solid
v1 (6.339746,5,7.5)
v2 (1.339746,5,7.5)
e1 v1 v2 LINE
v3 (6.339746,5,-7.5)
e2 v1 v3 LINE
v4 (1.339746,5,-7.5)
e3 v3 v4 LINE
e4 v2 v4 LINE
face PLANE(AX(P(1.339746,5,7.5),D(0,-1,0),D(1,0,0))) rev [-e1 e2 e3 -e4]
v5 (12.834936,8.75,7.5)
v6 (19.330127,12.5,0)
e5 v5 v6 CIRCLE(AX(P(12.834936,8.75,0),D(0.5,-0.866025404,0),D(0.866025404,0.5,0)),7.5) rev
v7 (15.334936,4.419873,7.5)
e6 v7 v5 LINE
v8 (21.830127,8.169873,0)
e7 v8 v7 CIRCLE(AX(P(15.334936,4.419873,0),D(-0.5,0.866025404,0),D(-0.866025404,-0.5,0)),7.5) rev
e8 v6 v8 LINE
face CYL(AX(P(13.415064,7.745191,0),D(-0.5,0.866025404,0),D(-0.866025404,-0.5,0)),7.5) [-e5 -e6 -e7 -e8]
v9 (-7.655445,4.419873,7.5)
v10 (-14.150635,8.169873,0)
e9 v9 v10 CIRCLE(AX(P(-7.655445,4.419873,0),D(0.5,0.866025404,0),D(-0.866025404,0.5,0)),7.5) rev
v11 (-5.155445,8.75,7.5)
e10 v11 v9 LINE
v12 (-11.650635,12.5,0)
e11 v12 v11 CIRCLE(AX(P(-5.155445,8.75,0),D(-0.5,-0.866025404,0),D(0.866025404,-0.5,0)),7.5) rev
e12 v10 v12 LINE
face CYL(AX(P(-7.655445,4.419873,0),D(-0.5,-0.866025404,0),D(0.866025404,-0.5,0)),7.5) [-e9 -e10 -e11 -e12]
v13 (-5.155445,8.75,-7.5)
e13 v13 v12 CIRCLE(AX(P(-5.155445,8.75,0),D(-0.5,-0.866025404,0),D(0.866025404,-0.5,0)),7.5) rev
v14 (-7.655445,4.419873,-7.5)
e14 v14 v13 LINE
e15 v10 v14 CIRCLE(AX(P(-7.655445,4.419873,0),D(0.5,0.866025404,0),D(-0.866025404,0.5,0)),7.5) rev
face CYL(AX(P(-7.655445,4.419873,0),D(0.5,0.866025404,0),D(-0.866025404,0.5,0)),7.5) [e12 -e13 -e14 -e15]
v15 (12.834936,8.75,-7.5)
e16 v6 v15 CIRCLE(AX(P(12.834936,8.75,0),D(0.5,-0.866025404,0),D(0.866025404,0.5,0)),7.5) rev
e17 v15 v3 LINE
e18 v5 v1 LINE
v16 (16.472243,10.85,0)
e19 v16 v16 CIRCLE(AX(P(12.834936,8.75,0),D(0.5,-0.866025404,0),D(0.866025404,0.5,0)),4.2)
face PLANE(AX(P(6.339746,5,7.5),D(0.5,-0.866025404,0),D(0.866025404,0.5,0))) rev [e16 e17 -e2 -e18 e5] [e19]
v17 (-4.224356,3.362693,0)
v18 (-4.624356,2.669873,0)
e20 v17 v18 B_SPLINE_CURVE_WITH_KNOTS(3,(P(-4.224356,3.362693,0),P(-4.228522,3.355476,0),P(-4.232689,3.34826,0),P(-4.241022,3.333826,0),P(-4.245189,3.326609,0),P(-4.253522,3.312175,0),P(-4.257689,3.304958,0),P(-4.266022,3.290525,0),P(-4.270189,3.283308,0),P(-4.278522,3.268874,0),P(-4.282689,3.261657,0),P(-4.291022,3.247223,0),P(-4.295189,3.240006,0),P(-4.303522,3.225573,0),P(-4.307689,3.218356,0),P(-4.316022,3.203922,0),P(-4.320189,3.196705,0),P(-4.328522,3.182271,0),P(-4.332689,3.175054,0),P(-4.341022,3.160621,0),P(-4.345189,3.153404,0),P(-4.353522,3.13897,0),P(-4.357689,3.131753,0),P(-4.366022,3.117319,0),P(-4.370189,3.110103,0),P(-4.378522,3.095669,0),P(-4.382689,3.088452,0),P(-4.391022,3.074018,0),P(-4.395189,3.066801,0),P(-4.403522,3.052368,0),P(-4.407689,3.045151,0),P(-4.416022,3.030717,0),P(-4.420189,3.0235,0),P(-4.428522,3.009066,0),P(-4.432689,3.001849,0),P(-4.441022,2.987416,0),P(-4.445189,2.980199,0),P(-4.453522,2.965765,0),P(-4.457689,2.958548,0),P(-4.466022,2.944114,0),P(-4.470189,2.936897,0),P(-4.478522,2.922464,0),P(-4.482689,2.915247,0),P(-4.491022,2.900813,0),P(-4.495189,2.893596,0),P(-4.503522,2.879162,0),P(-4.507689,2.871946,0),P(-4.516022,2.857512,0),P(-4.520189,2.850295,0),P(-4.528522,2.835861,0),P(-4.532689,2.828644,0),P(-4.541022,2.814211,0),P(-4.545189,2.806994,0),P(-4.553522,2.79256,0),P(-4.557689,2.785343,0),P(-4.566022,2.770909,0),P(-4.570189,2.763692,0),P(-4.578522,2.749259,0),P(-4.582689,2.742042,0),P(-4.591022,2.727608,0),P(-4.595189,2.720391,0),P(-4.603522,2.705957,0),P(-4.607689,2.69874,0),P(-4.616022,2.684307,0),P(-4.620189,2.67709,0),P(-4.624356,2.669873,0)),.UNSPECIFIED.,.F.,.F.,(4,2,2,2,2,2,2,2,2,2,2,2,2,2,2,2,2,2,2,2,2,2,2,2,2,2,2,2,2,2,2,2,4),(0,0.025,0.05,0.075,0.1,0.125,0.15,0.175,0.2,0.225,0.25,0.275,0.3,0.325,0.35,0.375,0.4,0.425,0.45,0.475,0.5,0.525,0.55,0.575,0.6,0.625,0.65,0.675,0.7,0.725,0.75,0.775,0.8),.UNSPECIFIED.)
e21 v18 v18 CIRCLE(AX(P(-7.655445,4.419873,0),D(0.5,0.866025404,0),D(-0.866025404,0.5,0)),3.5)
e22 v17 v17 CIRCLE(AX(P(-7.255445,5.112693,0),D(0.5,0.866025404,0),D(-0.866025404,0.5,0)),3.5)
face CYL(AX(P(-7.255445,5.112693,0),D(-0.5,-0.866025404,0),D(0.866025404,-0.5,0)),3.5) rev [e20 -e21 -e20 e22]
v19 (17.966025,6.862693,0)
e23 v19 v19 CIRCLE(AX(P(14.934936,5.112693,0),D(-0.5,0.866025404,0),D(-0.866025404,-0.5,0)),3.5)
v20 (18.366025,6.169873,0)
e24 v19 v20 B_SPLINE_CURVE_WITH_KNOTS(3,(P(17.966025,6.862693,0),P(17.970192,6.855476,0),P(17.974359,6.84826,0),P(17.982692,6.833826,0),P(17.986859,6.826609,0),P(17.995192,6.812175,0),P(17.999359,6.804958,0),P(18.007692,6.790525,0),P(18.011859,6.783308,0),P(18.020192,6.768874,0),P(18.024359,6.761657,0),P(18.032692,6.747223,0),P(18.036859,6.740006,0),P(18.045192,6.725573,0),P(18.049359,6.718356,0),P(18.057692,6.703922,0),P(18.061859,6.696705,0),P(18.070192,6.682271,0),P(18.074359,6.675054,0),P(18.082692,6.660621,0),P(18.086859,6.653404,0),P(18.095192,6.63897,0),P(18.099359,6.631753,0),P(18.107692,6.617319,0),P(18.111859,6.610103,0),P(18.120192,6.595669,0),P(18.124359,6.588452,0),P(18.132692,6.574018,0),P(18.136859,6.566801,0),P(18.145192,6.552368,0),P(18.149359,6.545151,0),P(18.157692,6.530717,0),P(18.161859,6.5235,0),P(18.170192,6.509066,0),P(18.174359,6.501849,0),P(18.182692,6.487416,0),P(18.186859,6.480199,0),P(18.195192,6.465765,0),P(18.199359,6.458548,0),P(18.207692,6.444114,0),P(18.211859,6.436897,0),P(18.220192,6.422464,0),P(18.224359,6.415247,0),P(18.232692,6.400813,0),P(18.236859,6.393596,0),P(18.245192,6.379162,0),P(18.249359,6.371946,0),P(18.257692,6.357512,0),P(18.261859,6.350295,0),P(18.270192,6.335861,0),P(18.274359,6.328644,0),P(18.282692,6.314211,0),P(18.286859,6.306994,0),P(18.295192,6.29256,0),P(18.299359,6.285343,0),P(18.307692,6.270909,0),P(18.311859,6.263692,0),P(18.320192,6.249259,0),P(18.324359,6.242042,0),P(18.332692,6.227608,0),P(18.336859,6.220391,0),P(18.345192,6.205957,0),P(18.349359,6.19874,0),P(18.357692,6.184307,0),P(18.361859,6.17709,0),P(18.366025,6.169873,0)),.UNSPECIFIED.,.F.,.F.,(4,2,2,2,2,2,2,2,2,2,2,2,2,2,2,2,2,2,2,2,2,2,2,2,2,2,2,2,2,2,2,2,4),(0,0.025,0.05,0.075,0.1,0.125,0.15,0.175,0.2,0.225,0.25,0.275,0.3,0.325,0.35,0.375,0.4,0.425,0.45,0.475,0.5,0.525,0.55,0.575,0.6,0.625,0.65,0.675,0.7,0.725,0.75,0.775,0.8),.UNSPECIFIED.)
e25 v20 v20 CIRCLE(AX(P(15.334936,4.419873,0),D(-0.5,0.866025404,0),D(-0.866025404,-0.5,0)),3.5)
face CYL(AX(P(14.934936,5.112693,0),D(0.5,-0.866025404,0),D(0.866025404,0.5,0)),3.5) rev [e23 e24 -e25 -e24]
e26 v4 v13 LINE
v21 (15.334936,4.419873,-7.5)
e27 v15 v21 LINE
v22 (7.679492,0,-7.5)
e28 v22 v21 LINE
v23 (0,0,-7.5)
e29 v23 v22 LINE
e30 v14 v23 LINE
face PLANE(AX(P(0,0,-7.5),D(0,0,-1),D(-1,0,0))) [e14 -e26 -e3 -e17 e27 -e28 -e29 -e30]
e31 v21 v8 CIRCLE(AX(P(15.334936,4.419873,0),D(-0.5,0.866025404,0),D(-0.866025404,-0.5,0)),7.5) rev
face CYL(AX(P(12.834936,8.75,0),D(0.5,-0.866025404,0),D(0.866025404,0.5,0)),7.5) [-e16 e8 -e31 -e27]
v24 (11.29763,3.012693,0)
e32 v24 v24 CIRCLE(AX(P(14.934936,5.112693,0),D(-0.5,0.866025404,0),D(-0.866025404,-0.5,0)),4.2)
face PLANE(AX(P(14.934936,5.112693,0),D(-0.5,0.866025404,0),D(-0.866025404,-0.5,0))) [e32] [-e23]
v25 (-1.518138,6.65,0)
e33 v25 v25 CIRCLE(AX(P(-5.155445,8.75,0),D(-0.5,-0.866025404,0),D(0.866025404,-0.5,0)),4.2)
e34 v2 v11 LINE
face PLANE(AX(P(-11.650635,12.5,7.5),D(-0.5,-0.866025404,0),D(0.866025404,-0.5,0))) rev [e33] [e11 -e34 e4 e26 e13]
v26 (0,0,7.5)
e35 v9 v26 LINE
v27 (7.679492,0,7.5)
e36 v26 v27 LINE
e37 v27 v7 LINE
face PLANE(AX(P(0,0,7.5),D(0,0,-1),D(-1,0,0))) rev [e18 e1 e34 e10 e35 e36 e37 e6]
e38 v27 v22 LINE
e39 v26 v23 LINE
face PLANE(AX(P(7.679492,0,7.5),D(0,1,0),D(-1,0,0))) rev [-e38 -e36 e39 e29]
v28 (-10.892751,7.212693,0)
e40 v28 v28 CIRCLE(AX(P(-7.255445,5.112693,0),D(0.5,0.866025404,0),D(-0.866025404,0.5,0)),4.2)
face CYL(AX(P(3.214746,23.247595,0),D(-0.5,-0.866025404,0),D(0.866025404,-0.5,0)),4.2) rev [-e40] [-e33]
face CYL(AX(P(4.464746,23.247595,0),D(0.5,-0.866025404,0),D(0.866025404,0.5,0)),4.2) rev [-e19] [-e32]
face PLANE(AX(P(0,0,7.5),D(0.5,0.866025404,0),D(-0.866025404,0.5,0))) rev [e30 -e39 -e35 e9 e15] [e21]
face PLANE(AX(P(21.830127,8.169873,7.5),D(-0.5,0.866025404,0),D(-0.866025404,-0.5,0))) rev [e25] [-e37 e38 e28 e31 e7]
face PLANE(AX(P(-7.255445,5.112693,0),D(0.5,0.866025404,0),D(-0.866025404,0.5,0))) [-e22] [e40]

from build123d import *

# Parameters (mm, degrees)
EXTRUDE_1_DEPTH          = 7.5
CUT_EXTRUDE_1_DEPTH      = 27.249846584
CUT_EXTRUDE_1_DEPTH_BACK = 27.249846584
SKETCH_2_R               = 4.2
CUT_EXTRUDE_2_DEPTH      = 27.516200545
CUT_EXTRUDE_2_DEPTH_BACK = 27.516200545
SKETCH_3_R               = 4.2
FILLET_1_R               = 7.5
SKETCH_4_R               = 4.2
SKETCH_4_R_2             = 3.5
EXTRUDE_2_DEPTH          = 0.8
SKETCH_5_R               = 4.2
SKETCH_5_R_2             = 3.5
EXTRUDE_3_DEPTH          = 0.8


with BuildPart() as part:
    # ｽｹｯﾁ1 → ﾎﾞｽ - 押し出し1 (new, symmetric)
    with BuildSketch(Plane.XY):
        Polygon((0, 0), (-14.150635095, 8.169872981), (-11.650635095, 12.5), (1.339745962, 5), (6.339745962, 5), (19.330127019, 12.5), (21.830127019, 8.169872981), (7.679491924, 0), align=None)
    extrude(amount=EXTRUDE_1_DEPTH, both=True)

    # ｽｹｯﾁ2 → ｶｯﾄ - 押し出し1 (cut, two sides: drawn at the far end of the back side and taken through both)
    with BuildSketch(Plane(origin=(0, 0, 0), x_dir=(0, 0, 1), z_dir=(-0.5000000000000012, -0.866025403784438, 0)).offset(-CUT_EXTRUDE_1_DEPTH_BACK)):
        with Locations(Location((0, 8.839745962, 0), (0, 0, 270))):
            Circle(SKETCH_2_R)
    extrude(amount=CUT_EXTRUDE_1_DEPTH + CUT_EXTRUDE_1_DEPTH_BACK, mode=Mode.SUBTRACT)

    # ｽｹｯﾁ3 → ｶｯﾄ - 押し出し2 (cut, two sides: drawn at the far end of the back side and taken through both)
    with BuildSketch(Plane(origin=(1.919872981, -3.325317547, 0), x_dir=(0, 0, -1), z_dir=(0.5000000000000013, -0.8660254037844379, 0)).offset(-CUT_EXTRUDE_2_DEPTH_BACK)):
        with Locations(Location((0, 15.490381057, 0), (0, 0, 90))):
            Circle(SKETCH_3_R)
    extrude(amount=CUT_EXTRUDE_2_DEPTH + CUT_EXTRUDE_2_DEPTH_BACK, mode=Mode.SUBTRACT)

    # ﾌｨﾚｯﾄ1
    fillet_1_edges = [part.edges().sort_by_distance(p)[0] for p in [
        (20.580127019, 10.334936491, -7.5),
        (20.580127019, 10.334936491, 7.5),
        (-12.900635095, 10.334936491, -7.5),
        (-12.900635095, 10.334936491, 7.5),
    ]]
    fillet(fillet_1_edges, radius=FILLET_1_R - 0.0001)  # a hair under: the kernel refuses the full size

    # ｽｹｯﾁ4 → ﾎﾞｽ - 押し出し2 (add)
    with BuildSketch(Plane(origin=(0, 0, 0), x_dir=(0.8660254037844382, -0.500000000000001, 0), z_dir=(0.5000000000000009, 0.866025403784438, 0))):
        with Locations((-8.839745962, 0)):
            Circle(SKETCH_4_R)
        with Locations((-8.839745962, 0)):
            Circle(SKETCH_4_R_2, mode=Mode.SUBTRACT)
    extrude(amount=EXTRUDE_2_DEPTH)

    # ｽｹｯﾁ5 → ﾎﾞｽ - 押し出し3 (add)
    with BuildSketch(Plane(origin=(1.919872981, -3.325317547, 0), x_dir=(0.8660254037844378, 0.5000000000000017, 0), z_dir=(-0.5000000000000016, 0.8660254037844377, 0))):
        with Locations((15.490381057, 0)):
            Circle(SKETCH_5_R)
        with Locations((15.490381057, 0)):
            Circle(SKETCH_5_R_2, mode=Mode.SUBTRACT)
    extrude(amount=EXTRUDE_3_DEPTH)


solid = part.part
